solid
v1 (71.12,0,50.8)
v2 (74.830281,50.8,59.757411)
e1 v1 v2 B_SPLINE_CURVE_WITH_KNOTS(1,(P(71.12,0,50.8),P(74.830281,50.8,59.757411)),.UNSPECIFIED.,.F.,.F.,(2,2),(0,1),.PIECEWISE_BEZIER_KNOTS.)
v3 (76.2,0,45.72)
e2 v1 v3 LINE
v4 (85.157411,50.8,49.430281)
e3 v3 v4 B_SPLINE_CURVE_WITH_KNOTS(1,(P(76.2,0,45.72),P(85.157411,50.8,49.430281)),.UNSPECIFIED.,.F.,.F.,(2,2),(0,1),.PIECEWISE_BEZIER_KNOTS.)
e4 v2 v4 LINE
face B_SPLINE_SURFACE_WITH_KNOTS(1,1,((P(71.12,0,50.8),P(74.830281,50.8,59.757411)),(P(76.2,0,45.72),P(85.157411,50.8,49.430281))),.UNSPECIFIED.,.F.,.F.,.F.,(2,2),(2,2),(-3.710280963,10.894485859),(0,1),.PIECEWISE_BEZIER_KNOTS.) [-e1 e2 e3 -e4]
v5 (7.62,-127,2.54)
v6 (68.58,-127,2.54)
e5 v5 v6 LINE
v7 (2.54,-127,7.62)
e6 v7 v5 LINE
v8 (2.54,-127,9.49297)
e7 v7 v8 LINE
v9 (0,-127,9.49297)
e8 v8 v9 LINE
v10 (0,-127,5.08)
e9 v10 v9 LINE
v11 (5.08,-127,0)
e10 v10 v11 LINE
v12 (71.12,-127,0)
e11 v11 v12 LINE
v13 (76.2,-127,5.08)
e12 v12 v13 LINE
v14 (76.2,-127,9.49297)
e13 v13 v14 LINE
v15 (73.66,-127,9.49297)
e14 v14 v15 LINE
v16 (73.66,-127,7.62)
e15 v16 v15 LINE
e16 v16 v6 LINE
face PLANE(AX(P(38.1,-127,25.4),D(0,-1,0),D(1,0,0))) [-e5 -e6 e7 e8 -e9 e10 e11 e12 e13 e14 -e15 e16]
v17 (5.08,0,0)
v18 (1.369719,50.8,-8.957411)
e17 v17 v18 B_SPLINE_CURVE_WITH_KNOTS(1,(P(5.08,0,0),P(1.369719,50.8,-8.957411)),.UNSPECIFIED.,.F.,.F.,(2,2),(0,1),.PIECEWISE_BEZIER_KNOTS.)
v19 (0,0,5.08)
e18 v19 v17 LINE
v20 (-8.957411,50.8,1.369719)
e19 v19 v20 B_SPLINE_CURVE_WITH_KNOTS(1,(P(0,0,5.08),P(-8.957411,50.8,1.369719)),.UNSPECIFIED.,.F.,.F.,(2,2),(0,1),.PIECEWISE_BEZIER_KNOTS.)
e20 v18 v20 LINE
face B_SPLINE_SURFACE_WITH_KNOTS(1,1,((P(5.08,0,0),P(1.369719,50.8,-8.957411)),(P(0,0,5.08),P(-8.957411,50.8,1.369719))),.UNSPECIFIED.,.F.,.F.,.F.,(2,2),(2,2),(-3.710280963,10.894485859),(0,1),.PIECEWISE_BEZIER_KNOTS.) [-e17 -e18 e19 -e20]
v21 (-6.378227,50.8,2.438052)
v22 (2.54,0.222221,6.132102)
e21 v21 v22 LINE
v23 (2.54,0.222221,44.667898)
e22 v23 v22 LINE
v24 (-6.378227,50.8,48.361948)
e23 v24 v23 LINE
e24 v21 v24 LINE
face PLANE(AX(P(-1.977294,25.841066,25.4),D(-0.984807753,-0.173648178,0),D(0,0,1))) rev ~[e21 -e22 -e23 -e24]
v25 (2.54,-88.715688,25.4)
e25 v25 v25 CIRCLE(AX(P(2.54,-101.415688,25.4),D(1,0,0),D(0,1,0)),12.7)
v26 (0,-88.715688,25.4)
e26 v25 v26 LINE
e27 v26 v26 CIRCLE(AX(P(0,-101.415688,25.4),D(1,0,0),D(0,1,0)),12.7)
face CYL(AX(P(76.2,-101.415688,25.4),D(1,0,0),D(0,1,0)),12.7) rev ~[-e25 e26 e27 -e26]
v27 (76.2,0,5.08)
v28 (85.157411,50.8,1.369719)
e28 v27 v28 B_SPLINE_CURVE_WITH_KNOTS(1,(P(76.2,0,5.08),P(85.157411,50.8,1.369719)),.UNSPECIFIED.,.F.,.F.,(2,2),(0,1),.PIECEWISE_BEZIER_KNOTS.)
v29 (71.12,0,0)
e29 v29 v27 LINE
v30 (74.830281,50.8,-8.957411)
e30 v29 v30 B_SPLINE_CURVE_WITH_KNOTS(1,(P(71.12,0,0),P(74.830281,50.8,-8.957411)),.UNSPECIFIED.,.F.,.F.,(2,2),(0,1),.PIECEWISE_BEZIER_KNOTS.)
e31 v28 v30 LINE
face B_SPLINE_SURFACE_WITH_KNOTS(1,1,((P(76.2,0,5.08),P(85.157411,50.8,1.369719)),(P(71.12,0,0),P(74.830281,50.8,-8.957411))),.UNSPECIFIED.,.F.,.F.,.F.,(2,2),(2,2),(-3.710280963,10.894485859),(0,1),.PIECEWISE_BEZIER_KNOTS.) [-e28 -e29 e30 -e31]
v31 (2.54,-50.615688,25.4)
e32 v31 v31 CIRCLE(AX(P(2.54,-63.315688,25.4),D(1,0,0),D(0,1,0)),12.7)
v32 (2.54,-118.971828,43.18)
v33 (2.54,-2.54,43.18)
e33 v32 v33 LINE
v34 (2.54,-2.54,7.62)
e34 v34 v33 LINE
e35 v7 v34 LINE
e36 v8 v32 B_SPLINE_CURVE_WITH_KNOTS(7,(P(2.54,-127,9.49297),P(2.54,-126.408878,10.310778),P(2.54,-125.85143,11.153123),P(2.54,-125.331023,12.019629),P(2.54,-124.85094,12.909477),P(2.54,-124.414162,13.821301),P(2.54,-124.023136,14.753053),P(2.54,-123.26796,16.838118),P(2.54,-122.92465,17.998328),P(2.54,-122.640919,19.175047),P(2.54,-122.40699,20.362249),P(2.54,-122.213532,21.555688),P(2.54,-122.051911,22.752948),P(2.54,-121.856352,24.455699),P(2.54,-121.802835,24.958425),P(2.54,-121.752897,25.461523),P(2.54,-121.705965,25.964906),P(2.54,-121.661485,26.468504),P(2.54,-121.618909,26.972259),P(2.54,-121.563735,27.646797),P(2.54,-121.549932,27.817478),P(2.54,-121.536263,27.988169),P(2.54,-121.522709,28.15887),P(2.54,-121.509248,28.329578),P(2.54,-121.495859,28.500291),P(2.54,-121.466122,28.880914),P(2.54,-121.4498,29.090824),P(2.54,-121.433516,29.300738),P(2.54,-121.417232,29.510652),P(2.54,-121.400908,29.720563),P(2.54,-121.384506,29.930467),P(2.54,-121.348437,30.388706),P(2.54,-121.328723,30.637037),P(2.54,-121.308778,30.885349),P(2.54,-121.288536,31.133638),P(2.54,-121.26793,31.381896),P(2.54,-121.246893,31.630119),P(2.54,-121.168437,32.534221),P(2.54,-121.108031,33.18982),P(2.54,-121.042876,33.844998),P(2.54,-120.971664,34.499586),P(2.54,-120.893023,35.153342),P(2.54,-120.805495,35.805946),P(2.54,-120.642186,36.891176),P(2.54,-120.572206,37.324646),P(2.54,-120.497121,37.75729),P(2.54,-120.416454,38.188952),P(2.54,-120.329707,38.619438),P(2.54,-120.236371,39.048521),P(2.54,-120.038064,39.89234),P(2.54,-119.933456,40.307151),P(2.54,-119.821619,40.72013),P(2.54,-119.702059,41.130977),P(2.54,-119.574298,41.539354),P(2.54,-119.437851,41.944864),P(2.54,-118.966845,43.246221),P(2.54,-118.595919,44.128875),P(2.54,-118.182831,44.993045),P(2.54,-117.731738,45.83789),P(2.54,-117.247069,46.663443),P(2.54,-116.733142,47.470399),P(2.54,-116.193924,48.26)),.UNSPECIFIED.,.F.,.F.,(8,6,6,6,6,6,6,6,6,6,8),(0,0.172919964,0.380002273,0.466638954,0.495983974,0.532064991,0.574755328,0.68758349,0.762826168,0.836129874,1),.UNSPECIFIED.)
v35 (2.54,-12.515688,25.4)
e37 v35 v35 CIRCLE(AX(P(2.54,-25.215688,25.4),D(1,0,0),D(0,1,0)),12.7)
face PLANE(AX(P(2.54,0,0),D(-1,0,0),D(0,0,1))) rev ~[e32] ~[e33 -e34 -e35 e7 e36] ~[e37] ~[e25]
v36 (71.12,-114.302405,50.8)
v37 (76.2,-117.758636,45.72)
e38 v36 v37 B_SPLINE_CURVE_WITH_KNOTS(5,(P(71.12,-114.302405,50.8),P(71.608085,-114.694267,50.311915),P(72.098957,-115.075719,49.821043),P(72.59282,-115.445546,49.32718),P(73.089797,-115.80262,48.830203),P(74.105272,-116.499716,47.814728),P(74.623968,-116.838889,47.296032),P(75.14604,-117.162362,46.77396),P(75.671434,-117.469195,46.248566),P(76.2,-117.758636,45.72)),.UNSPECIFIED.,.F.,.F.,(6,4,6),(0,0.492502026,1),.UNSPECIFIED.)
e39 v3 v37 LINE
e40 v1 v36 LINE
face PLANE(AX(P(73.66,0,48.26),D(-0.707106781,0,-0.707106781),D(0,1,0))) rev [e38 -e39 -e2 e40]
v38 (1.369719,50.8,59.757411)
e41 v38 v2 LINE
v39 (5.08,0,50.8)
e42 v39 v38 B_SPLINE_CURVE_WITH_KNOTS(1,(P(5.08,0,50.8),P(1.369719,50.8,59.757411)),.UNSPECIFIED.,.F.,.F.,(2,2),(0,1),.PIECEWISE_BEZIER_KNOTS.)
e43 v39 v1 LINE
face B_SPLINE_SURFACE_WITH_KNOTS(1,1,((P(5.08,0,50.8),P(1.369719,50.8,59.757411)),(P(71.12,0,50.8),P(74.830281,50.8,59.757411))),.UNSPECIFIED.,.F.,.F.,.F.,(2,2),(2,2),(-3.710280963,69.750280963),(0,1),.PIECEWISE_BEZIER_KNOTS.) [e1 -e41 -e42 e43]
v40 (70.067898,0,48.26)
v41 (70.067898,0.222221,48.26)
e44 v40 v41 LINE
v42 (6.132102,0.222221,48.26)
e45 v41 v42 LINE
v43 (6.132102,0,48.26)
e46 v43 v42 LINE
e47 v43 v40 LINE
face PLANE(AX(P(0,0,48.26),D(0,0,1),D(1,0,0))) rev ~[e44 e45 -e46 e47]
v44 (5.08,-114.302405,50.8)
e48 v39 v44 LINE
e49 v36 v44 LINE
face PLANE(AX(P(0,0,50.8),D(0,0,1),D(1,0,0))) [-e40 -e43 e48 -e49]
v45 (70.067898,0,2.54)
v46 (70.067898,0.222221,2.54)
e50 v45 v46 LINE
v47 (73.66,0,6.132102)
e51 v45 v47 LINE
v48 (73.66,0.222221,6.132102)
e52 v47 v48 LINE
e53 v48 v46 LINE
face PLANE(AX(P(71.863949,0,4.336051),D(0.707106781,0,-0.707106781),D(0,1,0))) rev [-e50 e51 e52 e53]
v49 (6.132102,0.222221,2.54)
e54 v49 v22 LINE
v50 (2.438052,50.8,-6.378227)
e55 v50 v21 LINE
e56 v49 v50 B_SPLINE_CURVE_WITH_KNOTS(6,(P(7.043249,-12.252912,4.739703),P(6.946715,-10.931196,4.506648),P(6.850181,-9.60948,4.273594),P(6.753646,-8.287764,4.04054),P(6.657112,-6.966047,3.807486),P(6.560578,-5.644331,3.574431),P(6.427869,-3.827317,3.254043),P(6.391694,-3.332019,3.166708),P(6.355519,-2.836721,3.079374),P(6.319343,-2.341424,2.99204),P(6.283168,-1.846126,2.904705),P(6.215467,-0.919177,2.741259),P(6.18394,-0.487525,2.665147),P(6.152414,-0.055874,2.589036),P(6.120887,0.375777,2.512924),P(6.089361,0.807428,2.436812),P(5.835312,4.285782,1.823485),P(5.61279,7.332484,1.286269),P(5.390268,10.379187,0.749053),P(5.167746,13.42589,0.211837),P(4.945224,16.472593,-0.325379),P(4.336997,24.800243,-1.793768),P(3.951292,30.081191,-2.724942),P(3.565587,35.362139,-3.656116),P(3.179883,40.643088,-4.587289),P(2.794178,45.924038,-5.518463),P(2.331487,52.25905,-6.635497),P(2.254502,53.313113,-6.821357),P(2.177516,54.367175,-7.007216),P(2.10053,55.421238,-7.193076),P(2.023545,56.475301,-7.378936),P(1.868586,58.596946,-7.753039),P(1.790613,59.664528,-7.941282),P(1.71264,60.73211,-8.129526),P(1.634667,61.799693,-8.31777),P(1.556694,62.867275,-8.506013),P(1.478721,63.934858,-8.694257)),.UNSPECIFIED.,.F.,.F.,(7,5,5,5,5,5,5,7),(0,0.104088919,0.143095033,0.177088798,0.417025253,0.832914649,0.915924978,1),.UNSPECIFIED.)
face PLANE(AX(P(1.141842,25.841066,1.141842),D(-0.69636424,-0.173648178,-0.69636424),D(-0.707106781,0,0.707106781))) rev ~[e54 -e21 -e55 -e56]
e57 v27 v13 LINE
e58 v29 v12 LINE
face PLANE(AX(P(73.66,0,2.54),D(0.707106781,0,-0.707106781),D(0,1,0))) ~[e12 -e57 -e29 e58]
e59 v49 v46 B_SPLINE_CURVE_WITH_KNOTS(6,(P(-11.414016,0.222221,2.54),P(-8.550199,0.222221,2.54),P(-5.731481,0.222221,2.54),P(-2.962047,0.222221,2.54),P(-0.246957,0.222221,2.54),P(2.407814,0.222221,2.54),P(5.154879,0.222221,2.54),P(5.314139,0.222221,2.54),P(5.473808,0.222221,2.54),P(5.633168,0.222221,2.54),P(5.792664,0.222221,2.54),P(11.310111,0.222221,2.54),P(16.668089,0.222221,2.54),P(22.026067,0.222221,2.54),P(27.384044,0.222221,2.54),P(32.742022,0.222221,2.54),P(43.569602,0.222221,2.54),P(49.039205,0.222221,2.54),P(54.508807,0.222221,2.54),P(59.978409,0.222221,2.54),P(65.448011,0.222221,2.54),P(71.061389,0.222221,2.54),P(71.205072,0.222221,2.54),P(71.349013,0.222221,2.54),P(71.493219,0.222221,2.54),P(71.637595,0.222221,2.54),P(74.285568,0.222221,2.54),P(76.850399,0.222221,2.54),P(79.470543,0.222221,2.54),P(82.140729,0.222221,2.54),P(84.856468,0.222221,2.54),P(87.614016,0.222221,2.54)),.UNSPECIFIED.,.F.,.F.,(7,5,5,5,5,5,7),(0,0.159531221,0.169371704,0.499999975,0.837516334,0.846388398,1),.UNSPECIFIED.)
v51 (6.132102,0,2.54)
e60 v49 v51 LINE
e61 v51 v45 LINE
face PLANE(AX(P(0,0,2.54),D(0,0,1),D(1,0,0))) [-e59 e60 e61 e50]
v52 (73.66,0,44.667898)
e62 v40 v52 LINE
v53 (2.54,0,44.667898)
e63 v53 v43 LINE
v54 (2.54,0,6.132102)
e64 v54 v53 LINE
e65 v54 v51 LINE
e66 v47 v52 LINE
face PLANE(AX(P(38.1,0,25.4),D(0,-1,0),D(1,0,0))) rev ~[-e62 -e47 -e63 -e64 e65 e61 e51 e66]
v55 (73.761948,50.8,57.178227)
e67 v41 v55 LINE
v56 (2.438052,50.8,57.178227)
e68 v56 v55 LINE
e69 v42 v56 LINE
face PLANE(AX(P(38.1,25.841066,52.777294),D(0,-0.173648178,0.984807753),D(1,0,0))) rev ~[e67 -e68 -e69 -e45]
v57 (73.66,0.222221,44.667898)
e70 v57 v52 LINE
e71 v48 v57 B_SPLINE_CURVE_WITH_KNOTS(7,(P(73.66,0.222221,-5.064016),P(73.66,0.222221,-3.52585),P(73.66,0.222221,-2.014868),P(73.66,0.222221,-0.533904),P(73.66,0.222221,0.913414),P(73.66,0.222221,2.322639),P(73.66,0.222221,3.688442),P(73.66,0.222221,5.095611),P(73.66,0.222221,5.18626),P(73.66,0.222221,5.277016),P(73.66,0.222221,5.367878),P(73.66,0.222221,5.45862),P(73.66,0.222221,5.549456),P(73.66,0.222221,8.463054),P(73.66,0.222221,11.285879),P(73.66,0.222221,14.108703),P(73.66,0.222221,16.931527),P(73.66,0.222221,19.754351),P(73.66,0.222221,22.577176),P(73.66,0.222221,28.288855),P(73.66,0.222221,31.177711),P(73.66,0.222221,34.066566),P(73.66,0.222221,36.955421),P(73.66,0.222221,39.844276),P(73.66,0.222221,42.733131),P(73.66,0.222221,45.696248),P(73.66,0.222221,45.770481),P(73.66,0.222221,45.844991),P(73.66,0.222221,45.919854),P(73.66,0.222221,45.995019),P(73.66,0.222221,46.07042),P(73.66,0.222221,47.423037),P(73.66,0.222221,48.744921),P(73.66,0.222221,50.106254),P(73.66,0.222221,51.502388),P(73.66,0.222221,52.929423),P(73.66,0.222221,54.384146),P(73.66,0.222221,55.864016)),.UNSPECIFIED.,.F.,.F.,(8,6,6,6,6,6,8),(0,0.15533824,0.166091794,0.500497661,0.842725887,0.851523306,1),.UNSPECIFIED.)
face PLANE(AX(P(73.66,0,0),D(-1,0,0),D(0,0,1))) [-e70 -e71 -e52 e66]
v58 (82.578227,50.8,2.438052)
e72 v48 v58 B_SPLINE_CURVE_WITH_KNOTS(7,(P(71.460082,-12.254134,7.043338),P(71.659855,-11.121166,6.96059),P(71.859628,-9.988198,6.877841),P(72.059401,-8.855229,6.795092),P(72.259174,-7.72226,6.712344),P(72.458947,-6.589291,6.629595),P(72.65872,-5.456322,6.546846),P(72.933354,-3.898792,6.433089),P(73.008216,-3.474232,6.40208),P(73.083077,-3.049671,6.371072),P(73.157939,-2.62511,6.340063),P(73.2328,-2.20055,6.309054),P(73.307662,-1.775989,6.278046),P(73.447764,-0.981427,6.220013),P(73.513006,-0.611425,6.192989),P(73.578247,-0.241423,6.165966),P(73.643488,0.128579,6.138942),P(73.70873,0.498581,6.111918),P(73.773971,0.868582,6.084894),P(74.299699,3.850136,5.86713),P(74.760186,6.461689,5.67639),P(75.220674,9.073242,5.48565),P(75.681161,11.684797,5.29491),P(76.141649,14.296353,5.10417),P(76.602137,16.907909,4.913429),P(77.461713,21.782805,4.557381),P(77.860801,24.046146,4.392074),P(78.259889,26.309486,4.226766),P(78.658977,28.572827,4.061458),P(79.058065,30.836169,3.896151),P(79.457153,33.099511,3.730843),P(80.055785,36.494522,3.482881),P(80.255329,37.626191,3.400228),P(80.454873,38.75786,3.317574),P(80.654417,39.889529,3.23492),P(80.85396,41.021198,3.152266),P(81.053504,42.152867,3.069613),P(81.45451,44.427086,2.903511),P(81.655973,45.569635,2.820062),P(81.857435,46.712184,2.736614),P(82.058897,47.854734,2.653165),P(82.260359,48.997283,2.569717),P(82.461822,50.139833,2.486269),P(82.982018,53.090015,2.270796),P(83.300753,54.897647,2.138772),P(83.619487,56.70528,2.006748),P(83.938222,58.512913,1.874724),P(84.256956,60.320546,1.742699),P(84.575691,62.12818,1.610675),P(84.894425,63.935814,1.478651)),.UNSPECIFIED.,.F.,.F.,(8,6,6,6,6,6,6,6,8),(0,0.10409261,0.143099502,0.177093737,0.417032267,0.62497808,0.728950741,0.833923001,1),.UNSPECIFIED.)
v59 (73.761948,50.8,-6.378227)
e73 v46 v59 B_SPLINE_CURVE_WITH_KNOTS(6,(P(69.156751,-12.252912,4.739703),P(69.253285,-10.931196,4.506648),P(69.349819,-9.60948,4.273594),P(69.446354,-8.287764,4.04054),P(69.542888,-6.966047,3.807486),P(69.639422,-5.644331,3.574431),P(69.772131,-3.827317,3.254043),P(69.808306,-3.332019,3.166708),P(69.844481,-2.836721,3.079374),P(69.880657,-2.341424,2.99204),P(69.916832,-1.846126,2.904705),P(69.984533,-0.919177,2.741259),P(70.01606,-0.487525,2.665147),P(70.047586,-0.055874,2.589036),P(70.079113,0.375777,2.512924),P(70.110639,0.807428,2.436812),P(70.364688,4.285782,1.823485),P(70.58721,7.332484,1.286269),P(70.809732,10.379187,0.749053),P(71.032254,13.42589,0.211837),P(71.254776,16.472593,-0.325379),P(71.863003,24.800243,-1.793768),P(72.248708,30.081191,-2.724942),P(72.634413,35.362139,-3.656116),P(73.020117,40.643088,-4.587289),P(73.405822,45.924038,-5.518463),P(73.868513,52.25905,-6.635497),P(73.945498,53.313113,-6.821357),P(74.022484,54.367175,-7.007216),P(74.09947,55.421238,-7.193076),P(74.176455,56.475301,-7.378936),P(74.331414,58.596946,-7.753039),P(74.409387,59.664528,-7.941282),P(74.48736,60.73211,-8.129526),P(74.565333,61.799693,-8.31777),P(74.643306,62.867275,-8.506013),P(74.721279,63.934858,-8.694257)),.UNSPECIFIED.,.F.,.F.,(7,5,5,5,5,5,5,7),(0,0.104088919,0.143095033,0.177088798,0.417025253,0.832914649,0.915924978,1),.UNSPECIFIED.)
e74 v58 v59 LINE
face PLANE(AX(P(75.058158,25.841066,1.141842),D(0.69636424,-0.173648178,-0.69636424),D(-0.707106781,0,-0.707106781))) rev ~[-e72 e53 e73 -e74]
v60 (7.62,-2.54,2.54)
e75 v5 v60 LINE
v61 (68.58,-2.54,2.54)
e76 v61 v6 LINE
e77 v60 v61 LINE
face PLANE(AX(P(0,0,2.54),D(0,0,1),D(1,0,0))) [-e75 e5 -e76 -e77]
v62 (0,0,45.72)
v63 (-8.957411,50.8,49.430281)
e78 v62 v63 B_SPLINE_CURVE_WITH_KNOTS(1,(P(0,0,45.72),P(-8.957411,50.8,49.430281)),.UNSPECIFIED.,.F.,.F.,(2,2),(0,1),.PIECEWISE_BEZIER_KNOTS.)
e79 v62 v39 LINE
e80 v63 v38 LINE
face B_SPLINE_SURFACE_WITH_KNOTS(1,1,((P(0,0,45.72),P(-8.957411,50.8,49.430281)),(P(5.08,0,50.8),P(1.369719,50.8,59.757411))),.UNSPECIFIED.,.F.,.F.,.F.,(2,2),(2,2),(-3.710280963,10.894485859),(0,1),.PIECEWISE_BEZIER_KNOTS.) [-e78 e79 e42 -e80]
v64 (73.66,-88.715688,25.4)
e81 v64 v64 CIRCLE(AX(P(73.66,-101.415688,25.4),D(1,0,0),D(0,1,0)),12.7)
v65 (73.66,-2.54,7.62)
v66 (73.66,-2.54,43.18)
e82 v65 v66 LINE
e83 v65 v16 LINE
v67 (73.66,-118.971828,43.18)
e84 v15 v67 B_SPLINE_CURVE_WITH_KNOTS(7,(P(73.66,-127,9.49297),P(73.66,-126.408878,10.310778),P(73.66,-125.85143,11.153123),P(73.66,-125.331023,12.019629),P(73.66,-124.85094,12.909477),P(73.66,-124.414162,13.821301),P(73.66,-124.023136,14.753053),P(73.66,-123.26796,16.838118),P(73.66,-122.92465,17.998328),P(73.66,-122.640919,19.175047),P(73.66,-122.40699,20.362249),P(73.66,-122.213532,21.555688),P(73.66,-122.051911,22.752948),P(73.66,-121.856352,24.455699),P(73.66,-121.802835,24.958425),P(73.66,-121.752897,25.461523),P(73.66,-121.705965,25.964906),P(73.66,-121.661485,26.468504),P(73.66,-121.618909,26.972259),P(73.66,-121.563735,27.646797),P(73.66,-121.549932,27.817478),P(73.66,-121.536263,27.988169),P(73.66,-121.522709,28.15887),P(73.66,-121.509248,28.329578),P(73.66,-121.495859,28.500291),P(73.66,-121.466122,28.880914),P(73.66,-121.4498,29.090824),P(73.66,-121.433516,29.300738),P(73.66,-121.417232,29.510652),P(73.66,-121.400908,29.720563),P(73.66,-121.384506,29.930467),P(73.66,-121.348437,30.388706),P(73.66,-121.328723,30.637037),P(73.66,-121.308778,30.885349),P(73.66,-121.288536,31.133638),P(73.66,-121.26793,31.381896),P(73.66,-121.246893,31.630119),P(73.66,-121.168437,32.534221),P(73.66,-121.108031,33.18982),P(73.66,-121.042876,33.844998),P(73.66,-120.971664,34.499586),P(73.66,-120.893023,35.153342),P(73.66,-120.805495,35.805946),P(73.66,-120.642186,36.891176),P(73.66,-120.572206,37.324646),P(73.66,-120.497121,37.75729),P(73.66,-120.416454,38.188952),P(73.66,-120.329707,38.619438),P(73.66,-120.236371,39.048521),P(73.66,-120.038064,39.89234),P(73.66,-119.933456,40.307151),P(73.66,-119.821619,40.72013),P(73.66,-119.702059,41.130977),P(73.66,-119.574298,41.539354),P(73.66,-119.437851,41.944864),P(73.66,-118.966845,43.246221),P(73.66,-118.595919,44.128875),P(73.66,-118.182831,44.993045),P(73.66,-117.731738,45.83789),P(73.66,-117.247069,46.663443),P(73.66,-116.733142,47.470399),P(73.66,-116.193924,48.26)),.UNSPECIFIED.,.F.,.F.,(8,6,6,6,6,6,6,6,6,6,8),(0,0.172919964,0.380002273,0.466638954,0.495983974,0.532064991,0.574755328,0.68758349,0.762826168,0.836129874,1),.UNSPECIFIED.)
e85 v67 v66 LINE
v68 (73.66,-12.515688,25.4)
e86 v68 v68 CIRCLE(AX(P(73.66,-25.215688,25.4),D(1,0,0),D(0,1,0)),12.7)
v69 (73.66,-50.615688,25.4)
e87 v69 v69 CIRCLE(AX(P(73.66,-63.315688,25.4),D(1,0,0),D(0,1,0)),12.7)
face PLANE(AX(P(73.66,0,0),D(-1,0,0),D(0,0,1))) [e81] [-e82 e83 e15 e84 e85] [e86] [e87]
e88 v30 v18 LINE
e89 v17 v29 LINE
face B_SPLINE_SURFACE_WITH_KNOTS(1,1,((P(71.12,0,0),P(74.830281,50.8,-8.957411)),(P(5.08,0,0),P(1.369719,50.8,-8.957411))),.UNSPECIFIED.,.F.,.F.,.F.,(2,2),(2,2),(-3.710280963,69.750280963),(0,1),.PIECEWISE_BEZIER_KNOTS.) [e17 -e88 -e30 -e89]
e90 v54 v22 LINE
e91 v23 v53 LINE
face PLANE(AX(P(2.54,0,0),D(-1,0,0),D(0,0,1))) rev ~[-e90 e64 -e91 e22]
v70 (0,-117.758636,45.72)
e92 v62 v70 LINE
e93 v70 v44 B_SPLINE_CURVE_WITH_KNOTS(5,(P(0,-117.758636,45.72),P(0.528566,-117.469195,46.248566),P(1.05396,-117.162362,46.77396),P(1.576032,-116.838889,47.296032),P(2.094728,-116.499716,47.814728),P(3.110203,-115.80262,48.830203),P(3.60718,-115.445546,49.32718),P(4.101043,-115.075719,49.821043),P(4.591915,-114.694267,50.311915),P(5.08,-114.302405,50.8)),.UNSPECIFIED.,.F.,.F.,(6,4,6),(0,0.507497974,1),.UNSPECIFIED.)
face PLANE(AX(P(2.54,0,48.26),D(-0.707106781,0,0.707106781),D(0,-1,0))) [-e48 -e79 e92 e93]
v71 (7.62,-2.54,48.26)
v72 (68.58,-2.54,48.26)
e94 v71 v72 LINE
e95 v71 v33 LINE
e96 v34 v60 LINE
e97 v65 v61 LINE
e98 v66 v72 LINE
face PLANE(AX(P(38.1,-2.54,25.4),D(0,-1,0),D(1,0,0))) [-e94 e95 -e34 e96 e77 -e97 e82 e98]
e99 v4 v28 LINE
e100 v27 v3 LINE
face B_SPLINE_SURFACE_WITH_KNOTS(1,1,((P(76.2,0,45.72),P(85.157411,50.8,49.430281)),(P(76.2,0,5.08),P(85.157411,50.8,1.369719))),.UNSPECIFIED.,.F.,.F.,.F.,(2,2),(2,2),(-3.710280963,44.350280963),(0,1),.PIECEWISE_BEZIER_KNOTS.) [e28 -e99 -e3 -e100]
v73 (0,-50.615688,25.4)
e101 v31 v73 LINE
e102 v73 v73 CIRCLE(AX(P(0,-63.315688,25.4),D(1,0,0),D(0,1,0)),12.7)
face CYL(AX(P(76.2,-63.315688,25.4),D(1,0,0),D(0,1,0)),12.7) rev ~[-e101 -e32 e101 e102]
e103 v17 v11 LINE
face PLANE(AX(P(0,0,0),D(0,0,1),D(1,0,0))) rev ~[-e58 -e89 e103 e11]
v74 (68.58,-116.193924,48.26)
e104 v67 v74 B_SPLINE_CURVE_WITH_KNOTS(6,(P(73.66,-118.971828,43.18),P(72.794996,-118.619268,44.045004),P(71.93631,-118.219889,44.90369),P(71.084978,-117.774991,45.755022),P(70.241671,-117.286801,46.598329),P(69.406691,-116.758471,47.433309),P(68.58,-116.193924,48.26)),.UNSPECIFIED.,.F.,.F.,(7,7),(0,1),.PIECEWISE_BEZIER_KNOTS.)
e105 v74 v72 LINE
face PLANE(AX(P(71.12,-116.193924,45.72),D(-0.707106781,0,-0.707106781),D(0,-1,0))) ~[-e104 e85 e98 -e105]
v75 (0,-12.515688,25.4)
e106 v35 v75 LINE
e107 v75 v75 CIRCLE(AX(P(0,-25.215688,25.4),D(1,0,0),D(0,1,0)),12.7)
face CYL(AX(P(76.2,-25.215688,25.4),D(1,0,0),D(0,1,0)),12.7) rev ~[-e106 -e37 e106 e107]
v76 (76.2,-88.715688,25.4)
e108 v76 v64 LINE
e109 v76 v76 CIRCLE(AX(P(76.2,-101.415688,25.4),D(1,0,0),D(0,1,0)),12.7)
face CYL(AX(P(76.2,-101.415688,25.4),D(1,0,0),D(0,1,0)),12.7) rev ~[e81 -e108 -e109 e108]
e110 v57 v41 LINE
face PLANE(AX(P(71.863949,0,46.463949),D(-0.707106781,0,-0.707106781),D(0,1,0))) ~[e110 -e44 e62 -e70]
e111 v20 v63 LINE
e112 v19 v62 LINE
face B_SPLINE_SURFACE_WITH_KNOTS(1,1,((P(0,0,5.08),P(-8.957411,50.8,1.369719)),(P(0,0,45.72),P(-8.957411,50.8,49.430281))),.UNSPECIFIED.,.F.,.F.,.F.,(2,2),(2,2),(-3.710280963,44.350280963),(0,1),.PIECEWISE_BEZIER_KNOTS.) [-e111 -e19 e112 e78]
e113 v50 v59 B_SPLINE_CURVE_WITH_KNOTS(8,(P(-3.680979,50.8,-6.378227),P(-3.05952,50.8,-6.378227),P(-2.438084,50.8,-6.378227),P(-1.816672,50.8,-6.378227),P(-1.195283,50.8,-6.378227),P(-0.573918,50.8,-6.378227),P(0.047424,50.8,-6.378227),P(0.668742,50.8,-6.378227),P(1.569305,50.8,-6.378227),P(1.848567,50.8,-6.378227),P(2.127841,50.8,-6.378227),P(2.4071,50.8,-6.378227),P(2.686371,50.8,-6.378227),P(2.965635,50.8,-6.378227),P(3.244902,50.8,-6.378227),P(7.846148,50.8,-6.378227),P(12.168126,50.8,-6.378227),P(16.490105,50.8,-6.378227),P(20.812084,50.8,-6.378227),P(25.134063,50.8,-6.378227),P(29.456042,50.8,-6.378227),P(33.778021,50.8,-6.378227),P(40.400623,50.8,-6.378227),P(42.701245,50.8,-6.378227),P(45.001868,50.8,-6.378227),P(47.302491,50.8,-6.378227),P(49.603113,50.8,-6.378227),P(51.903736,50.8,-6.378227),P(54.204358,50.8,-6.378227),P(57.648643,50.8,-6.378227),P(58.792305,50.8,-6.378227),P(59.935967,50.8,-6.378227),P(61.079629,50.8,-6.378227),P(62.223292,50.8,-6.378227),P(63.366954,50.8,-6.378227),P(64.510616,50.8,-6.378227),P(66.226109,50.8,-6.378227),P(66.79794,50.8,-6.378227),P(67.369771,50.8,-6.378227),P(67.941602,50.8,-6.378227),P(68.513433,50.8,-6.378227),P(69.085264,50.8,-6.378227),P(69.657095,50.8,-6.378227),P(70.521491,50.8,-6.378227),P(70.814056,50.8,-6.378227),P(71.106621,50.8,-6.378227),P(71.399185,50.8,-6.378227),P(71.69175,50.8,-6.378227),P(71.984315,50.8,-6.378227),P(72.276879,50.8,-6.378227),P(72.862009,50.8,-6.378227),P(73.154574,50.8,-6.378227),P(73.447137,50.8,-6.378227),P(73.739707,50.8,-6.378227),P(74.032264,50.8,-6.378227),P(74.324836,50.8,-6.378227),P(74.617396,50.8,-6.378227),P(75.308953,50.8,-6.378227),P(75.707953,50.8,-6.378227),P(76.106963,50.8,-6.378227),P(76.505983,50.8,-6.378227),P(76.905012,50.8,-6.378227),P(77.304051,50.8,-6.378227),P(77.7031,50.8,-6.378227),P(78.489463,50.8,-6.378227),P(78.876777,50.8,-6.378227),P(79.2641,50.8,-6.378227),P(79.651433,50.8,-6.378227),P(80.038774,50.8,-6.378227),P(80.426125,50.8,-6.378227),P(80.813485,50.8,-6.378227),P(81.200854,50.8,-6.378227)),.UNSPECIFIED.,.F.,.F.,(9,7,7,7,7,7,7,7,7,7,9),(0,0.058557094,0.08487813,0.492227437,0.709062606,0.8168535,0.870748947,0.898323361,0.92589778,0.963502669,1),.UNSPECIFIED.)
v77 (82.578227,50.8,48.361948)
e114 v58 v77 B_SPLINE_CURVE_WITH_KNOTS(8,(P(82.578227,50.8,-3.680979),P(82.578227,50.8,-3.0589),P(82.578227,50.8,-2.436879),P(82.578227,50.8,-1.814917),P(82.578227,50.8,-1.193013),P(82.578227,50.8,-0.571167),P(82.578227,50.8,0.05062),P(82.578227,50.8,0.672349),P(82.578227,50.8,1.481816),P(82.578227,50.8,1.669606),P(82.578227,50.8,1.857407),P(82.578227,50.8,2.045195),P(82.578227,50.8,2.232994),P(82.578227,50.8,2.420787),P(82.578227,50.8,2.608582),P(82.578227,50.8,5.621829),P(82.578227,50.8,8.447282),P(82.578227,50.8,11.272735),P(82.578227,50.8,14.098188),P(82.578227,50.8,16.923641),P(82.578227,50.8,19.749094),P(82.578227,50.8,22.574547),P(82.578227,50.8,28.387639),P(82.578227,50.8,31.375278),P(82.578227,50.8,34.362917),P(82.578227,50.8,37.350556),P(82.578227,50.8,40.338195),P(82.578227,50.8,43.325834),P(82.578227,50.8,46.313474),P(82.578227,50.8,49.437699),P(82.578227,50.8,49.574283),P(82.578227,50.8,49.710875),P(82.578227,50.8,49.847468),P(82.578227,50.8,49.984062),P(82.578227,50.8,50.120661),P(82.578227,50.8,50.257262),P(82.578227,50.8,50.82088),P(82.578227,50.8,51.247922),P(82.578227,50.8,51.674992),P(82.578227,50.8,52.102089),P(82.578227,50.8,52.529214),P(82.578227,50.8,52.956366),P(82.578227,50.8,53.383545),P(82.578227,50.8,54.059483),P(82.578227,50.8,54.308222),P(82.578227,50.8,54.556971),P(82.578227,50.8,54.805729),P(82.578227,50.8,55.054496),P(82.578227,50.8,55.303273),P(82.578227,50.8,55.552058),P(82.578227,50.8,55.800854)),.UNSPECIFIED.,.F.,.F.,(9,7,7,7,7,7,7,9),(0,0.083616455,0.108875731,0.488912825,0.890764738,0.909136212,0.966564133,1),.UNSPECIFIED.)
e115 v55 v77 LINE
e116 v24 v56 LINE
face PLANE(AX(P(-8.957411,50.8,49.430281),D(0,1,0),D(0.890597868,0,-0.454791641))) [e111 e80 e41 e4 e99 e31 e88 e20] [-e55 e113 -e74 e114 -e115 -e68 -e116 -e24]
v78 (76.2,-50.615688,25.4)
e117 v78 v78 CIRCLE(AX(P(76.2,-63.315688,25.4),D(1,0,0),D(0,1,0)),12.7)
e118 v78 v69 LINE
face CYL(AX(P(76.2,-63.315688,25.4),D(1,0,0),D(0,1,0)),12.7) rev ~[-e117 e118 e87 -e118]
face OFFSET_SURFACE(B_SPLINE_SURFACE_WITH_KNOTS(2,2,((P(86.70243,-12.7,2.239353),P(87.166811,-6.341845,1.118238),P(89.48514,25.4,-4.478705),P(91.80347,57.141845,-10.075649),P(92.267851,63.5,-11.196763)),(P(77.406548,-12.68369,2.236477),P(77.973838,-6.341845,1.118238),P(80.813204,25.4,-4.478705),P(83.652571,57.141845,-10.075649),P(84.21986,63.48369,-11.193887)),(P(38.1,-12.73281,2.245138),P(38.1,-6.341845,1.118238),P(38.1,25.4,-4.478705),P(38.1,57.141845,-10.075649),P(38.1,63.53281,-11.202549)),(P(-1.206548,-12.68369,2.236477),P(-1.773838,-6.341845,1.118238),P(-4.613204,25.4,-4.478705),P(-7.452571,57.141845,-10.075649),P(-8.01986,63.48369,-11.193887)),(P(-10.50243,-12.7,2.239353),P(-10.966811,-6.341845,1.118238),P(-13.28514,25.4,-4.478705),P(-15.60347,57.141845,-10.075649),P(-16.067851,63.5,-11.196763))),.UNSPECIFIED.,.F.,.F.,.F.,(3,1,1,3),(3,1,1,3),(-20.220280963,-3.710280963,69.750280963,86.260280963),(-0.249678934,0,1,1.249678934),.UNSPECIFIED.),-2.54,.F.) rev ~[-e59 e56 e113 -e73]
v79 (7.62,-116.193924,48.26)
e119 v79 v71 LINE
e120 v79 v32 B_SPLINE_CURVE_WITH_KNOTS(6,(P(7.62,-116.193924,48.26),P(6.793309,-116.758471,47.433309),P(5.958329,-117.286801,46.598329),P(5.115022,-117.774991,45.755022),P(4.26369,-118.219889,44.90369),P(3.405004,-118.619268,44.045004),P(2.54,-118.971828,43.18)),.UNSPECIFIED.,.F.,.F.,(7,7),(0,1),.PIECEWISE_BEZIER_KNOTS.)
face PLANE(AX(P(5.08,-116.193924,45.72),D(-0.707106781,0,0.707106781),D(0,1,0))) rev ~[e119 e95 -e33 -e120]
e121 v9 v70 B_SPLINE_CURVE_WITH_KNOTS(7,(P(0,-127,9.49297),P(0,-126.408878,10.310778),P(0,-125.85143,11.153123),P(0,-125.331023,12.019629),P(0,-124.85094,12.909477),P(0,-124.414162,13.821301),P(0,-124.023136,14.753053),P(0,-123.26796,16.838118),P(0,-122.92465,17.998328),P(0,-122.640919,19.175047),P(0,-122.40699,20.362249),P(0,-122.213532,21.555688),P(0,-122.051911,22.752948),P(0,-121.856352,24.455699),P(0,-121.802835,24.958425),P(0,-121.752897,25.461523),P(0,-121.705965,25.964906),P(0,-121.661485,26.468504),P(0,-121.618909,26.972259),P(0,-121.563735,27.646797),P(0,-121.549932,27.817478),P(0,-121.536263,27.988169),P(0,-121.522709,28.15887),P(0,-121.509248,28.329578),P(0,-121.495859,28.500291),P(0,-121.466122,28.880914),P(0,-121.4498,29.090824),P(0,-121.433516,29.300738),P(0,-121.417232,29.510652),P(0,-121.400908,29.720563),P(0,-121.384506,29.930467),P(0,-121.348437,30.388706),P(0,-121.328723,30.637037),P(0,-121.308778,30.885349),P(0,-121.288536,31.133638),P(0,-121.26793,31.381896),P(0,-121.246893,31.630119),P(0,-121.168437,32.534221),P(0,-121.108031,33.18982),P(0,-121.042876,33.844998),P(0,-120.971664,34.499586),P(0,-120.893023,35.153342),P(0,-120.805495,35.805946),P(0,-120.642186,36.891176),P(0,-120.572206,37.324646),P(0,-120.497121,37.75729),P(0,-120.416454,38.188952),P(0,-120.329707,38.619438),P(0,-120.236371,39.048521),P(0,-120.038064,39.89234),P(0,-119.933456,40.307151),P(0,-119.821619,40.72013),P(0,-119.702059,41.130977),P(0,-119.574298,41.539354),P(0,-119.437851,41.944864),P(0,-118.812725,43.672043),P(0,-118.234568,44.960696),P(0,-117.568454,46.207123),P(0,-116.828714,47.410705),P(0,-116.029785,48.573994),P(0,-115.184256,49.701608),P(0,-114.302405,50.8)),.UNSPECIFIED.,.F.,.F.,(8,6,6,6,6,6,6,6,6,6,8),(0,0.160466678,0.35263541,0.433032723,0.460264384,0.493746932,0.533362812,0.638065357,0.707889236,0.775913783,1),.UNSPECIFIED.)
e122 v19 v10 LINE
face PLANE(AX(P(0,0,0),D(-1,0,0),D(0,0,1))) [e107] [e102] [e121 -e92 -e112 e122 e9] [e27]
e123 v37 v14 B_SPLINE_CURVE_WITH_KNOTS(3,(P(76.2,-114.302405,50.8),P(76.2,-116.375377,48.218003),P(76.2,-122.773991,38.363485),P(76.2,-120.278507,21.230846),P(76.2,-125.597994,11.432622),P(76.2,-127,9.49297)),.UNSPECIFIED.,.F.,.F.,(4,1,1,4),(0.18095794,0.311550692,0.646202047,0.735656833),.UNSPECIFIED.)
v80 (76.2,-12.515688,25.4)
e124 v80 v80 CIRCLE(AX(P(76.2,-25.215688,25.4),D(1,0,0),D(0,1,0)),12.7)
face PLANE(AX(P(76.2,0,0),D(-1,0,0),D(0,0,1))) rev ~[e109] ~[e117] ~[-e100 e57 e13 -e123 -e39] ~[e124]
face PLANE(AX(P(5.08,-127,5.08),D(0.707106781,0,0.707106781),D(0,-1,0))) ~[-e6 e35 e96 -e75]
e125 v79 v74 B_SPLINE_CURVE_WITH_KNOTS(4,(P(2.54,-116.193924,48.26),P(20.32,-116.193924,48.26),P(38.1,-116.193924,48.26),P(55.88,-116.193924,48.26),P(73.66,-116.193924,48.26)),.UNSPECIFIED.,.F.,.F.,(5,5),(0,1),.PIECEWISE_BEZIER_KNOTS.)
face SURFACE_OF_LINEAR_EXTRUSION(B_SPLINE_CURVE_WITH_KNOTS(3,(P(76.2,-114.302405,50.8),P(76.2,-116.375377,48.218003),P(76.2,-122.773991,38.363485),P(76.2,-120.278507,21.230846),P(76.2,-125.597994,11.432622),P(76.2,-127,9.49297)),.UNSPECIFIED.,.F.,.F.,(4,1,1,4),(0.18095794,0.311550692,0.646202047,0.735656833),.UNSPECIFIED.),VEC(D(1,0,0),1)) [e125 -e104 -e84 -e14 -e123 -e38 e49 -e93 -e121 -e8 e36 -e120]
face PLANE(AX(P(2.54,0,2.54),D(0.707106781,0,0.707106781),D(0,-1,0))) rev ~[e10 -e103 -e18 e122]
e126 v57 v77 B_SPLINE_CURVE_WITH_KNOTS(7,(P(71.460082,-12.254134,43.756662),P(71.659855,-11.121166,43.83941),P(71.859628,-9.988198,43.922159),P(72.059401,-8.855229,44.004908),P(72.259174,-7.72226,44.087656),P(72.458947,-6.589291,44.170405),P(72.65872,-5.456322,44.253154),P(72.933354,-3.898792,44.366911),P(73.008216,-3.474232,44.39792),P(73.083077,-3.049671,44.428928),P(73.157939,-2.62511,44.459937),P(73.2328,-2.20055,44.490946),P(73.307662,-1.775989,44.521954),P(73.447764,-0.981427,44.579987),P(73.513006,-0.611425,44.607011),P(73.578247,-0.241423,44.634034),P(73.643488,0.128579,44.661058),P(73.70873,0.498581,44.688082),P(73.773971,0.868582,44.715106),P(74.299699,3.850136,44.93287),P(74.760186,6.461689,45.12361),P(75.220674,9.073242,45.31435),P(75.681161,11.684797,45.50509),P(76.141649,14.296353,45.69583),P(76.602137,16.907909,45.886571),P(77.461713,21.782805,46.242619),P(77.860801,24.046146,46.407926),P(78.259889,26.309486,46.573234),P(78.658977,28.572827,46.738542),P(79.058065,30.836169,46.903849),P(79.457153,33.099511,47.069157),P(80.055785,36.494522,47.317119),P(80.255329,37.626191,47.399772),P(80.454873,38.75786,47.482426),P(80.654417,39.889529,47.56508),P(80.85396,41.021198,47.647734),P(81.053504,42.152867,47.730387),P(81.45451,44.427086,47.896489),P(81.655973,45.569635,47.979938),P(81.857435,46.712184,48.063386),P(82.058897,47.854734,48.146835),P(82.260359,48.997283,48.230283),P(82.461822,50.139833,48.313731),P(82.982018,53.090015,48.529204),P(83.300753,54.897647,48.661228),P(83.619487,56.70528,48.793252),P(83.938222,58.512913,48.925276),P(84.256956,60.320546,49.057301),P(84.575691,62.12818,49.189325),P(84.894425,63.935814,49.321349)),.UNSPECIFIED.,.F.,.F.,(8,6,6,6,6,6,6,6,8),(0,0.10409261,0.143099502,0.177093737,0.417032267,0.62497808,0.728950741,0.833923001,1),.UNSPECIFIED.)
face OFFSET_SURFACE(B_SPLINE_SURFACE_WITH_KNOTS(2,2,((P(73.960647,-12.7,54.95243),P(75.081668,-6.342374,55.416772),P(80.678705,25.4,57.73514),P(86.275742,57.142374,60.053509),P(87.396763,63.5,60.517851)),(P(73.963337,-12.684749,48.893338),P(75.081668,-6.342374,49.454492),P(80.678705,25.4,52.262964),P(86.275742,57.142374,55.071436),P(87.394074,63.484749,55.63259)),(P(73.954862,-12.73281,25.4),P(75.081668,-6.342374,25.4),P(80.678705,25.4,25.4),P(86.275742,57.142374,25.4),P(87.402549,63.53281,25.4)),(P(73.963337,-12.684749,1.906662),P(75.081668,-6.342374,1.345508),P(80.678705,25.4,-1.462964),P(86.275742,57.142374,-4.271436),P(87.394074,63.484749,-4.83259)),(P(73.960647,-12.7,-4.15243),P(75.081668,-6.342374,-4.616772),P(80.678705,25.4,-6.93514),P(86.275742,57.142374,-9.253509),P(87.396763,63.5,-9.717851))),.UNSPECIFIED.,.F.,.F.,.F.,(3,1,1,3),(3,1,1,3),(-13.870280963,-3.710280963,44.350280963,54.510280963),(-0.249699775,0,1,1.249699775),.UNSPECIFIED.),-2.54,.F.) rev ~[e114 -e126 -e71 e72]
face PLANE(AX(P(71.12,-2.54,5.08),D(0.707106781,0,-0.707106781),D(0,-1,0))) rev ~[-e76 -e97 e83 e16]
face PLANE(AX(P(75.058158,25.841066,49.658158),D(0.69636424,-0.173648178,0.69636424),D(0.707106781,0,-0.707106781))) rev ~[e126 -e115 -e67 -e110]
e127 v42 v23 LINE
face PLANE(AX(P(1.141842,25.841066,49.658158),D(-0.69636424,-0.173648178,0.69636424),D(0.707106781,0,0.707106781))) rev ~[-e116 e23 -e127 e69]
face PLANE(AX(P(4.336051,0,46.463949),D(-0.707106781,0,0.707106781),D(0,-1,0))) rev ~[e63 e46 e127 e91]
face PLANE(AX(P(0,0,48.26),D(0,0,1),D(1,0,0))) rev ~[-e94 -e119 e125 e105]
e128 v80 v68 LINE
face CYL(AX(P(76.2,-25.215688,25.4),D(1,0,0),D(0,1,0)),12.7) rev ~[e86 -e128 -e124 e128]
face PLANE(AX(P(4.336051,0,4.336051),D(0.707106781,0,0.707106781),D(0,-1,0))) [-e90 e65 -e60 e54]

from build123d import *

# Parameters (mm, degrees)
F0_W     = 76.2
F0_H     = 50.8
F1_DEPTH = 127
F2_T     = -2.54
F3_R     = 12.7
F4_DEPTH = 76.201
F6_DEPTH = 76.201
F7_SIZE  = 5.08
F9_DEPTH = 50.8
F9_TAPER = -10
F10_T    = -2.54


with BuildPart() as f1:
    # F0 (on Front) → F1 (new body)
    with BuildSketch(Plane.XZ):
        with Locations((38.1, 25.4)):
            Rectangle(F0_W, F0_H)
    extrude(amount=F1_DEPTH)

    # F2
    f2_openings = [f1.faces().sort_by_distance(p)[0] for p in [
        (38.1, -127, 25.4),
    ]]
    offset(amount=F2_T, openings=f2_openings)

    # F3 (on face) → F4 (cut, through all)
    with BuildSketch(Plane.YZ.offset(76.2)):
        with Locations((-101.4156882687, 25.4)):
            Circle(F3_R)
        with Locations((-63.3156882687, 25.4)):
            Circle(F3_R)
        with Locations((-25.2156882687, 25.4)):
            Circle(F3_R)
    extrude(amount=-F4_DEPTH, mode=Mode.SUBTRACT)

    # F5 (on face) → F6 (cut, through all)
    with BuildSketch(Plane.YZ.offset(76.2)):
        with BuildLine():
            add(Edge.make_bspline(
                [(-114.3024048609, 50.8), (-116.3753766316, 48.2180029007), (-122.7739913645, 38.3634851462), (-120.2785073467, 21.2308461151), (-125.5979944732, 11.4326219351), (-127, 9.4929700746)],
                knots=[0.1809579396, 0.1809579396, 0.1809579396, 0.1809579396, 0.3115506916, 0.6462020469, 0.7356568333, 0.7356568333, 0.7356568333, 0.7356568333], degree=3))
            Line((-114.3024048609, 50.8), (-127, 50.8))
            Line((-127, 50.8), (-127, 9.4929700746))
        make_face()
    extrude(amount=-F6_DEPTH, mode=Mode.SUBTRACT)

    # F7
    f7_edges = [f1.edges().sort_by_distance(p)[0] for p in [
        (2.54, -64.77, 2.54),
        (73.66, -64.77, 2.54),
        (2.54, -59.366962, 48.26),
        (73.66, -59.366962, 48.26),
        (0, -57.151202, 50.8),
        (76.2, -57.151202, 50.8),
        (0, -63.5, 0),
        (76.2, -63.5, 0),
    ]]
    chamfer(f7_edges, length=F7_SIZE)

    # F8 (on face) → F9 (join)
    with BuildSketch(Plane(origin=(0, 0, 0), x_dir=(-1, 0, 0), z_dir=(0, 1, 0))):
        Polygon((0, 45.72), (-5.08, 50.8), (-71.12, 50.8), (-76.2, 45.72), (-76.2, 9.4929700837), (-76.2, 5.08), (-71.12, 0), (-5.08, 0), (0, 5.08), align=None)
    extrude(amount=F9_DEPTH, taper=F9_TAPER)

    # F10
    f10_openings = [f1.faces().sort_by_distance(p)[0] for p in [
        (38.1, 50.8, 25.4),
    ]]
    offset(amount=F10_T, openings=f10_openings, kind=Kind.INTERSECTION)


solid = f1.part
